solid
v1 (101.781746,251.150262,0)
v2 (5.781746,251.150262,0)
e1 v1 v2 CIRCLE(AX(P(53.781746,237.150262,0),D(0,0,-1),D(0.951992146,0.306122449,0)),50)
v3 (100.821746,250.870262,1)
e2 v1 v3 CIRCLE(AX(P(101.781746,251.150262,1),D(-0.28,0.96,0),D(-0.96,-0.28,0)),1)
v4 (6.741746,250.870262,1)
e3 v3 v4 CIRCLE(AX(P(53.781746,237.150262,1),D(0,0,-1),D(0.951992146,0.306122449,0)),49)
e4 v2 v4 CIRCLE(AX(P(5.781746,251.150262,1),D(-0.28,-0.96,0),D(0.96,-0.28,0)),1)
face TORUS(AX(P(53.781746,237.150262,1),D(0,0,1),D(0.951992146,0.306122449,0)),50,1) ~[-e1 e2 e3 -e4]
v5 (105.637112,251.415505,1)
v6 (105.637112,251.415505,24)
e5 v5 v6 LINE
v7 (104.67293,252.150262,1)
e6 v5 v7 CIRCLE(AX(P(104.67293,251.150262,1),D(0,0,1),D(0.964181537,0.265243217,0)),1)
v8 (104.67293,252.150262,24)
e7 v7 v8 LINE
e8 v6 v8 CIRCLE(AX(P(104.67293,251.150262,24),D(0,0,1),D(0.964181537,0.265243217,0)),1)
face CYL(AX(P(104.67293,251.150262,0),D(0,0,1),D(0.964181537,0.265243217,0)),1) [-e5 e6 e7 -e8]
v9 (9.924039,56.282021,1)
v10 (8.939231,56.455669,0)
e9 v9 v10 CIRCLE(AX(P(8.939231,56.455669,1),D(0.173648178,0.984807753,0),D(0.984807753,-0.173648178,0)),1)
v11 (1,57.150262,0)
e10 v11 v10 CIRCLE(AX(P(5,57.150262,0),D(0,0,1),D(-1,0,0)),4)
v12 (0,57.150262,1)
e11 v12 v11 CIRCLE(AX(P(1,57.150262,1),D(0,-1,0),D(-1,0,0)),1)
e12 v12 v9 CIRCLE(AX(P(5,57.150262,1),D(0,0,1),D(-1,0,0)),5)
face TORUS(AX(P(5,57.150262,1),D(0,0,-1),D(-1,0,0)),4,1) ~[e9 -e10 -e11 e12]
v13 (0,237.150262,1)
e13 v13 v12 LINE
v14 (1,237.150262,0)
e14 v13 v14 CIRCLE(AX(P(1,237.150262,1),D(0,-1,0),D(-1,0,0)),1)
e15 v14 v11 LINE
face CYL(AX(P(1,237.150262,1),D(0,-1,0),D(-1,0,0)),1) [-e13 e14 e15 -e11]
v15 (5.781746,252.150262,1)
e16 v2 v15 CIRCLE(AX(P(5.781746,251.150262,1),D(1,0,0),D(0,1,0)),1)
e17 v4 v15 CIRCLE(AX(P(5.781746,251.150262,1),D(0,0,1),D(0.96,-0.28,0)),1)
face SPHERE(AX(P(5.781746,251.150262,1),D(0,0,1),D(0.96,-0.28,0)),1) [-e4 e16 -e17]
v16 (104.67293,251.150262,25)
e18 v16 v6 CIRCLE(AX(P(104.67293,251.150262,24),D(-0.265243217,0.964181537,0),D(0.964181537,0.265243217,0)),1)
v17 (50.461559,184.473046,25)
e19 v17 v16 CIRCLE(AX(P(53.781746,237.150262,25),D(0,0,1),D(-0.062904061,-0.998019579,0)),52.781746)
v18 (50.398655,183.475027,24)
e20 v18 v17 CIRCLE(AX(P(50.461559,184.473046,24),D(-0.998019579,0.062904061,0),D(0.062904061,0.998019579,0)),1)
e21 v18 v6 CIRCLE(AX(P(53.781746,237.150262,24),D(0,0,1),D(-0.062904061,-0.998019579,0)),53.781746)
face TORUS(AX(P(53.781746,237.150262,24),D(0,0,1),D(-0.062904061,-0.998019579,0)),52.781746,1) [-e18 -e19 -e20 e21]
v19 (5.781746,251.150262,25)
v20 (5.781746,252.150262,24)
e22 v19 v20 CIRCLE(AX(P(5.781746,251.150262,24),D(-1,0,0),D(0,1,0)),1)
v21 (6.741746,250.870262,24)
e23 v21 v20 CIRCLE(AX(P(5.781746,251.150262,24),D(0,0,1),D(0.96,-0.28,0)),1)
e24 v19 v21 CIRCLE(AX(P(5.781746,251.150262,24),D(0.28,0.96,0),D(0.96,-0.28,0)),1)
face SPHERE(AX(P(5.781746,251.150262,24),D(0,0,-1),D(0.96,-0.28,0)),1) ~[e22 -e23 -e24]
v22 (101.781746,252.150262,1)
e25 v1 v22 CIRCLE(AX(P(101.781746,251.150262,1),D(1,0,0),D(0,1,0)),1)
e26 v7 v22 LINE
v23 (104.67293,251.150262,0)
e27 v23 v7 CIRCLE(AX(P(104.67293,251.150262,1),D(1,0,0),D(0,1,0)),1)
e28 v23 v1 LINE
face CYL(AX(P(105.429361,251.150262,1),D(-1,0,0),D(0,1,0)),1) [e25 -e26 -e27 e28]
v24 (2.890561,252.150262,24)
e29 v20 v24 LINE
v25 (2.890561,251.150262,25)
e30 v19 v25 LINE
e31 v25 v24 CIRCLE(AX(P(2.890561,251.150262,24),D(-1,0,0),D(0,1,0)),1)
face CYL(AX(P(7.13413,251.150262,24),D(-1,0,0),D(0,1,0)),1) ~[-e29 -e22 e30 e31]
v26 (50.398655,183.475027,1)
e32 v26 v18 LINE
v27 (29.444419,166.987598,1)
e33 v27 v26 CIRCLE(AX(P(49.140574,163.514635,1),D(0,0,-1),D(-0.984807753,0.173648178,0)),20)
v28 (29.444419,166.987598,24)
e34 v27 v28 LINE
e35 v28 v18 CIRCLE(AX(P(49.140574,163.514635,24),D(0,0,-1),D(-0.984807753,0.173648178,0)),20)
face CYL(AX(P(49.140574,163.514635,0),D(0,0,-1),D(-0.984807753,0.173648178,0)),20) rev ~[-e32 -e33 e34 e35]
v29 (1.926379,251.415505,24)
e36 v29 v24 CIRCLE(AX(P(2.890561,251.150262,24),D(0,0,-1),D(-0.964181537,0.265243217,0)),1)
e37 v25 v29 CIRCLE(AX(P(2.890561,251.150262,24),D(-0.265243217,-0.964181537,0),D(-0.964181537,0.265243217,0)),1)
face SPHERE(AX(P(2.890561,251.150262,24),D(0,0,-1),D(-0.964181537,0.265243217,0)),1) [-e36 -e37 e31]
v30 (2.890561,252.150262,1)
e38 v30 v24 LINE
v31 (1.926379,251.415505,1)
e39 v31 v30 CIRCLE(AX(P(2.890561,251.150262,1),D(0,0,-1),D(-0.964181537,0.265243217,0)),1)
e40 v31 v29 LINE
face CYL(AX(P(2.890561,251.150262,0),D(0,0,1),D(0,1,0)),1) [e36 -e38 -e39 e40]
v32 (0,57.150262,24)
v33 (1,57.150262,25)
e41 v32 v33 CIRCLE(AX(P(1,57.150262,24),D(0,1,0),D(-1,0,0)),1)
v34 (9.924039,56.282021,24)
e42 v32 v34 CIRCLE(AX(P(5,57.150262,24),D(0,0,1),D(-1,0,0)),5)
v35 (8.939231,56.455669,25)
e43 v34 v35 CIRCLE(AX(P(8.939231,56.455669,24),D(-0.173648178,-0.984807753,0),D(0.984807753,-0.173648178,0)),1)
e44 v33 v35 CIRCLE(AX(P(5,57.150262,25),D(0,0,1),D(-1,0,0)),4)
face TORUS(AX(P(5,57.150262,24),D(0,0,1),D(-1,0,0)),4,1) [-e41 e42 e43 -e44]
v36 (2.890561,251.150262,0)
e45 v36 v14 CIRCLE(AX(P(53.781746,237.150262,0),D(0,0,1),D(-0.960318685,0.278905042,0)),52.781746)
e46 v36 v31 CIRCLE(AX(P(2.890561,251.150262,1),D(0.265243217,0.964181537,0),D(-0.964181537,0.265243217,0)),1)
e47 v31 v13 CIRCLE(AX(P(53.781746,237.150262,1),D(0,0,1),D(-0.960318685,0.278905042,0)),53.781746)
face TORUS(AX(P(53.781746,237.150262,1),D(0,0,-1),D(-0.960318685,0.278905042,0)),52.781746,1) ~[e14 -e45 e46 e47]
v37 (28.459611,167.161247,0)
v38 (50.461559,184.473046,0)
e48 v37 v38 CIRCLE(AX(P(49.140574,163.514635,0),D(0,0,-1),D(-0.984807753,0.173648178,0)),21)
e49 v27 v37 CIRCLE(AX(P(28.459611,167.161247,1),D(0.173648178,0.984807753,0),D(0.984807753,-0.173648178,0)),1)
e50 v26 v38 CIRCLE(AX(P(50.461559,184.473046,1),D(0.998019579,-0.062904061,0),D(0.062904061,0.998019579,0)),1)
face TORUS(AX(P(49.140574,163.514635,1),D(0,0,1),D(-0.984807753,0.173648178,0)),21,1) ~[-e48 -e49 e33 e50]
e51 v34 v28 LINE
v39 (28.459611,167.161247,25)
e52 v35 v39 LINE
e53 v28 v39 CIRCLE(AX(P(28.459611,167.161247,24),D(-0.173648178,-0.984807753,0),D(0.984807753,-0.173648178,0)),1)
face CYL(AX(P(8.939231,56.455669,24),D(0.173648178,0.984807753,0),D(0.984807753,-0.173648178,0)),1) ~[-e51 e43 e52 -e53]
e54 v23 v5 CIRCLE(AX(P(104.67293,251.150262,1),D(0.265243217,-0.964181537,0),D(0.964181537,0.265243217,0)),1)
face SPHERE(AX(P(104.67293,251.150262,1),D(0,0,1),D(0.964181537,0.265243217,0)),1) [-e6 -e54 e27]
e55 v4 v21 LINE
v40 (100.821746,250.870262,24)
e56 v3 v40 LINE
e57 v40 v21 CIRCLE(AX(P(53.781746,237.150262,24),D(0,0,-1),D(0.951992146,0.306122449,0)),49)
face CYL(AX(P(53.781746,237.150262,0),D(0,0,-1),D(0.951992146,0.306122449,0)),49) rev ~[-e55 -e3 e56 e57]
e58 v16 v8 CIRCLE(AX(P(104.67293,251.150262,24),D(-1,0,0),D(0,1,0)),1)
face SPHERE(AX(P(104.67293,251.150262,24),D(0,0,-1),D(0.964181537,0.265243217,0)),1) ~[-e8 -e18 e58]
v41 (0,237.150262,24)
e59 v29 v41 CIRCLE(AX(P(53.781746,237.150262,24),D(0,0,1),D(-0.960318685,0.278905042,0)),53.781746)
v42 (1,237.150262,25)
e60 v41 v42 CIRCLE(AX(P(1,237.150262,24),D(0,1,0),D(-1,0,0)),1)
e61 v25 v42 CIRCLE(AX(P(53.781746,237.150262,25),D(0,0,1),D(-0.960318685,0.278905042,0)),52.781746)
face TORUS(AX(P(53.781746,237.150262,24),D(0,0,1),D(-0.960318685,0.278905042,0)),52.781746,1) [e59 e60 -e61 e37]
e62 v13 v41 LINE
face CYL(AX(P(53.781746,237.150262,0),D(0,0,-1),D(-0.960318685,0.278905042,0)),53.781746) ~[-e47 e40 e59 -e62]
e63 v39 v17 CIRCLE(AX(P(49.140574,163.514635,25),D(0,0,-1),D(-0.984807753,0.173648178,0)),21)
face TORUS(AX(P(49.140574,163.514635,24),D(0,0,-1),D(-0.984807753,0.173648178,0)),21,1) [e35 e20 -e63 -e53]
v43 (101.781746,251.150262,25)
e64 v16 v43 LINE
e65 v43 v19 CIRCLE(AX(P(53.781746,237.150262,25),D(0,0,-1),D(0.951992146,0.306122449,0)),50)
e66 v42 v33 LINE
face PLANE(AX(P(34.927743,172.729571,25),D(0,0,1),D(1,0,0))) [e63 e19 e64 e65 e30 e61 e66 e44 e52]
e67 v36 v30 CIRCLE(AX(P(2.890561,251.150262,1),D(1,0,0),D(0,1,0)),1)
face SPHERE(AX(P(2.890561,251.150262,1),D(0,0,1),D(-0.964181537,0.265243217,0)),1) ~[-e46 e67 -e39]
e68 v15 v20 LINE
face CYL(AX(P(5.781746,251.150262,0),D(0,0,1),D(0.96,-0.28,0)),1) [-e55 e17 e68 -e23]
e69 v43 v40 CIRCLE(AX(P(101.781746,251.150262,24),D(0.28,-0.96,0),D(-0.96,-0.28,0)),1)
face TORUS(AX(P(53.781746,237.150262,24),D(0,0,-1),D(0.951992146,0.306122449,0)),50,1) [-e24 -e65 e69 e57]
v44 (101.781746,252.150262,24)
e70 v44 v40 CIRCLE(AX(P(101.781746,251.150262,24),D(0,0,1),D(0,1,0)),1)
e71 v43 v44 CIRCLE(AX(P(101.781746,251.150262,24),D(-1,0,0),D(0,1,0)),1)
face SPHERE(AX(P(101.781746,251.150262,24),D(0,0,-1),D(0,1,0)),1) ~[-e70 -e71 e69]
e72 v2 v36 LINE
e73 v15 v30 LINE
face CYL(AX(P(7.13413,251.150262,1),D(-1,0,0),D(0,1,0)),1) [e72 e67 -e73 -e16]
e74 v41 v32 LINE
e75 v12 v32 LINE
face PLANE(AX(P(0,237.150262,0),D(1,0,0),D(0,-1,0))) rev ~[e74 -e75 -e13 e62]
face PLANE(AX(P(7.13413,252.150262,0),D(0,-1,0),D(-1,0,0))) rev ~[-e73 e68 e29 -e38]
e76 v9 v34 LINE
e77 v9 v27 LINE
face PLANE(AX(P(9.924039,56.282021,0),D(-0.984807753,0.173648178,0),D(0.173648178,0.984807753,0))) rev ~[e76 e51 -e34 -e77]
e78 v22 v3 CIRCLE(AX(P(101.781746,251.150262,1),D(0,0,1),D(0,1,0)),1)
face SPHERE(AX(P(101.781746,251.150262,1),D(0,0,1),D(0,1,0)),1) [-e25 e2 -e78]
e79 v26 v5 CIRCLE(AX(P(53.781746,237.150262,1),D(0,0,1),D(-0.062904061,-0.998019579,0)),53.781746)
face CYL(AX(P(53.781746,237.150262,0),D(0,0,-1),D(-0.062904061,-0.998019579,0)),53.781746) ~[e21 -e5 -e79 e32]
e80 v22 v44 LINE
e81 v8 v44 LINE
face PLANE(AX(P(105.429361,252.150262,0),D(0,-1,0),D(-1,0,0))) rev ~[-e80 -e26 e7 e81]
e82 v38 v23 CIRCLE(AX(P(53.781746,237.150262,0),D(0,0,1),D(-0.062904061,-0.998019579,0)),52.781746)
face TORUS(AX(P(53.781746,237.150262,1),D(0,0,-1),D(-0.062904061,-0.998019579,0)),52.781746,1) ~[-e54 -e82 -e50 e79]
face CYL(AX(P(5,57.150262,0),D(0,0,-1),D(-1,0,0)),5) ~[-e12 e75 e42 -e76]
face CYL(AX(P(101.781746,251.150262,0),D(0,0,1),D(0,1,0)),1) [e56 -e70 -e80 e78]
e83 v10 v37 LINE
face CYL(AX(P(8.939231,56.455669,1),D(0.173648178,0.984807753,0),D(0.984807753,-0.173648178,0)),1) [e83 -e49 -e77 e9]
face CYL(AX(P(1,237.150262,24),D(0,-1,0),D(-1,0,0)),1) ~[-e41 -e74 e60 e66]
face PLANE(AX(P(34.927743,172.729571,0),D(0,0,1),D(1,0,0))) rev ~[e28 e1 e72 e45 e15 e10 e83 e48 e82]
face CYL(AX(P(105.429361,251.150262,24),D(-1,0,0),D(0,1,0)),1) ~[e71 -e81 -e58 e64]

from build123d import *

# Parameters (mm, degrees)
F1_DEPTH = 25
F2_R     = 1


with BuildPart() as f1:
    # F0 (on Top) → F1 (new body)
    with BuildSketch(Plane.XY):
        with BuildLine():
            Line((0, 237.1502615138), (0, 57.1502615138))
            ThreePointArc((0, 57.1502615138), (4.5642212863, 52.1692880233), (9.9240387651, 56.2820206255))
            Line((9.9240387651, 56.2820206255), (29.4444190586, 166.987598496))
            ThreePointArc((29.4444190586, 166.987598496), (36.7733002708, 179.2324763201), (50.3986553344, 183.4750265133))
            ThreePointArc((50.3986553344, 183.4750265133), (95.7512352541, 203.5193518716), (105.4293606826, 252.1502615138))
            Line((105.4293606826, 252.1502615138), (100.4293606826, 252.1502615138))
            ThreePointArc((100.4293606826, 252.1502615138), (53.7817455238, 188.1502615138), (7.134130365, 252.1502615138))
            Line((7.134130365, 252.1502615138), (2.134130365, 252.1502615138))
            ThreePointArc((2.134130365, 252.1502615138), (0.536205584, 244.7257897531), (0, 237.1502615138))
        make_face()
    extrude(amount=F1_DEPTH)

    # F2
    f2_edges = [f1.edges().sort_by_distance(p)[0] for p in [
        (19.684229, 111.63481, 25),
        (102.929361, 252.150262, 25),
        (53.781746, 188.150262, 25),
        (4.63413, 252.150262, 25),
        (0.536206, 244.72579, 25),
        (19.684229, 111.63481, 0),
        (36.7733, 179.232476, 0),
        (95.751235, 203.519352, 0),
        (36.7733, 179.232476, 25),
        (95.751235, 203.519352, 25),
        (102.929361, 252.150262, 0),
        (53.781746, 188.150262, 0),
        (0, 147.150262, 0),
        (4.63413, 252.150262, 0),
        (0.536206, 244.72579, 0),
        (4.564221, 52.169288, 0),
        (105.429361, 252.150262, 12.5),
        (100.429361, 252.150262, 12.5),
        (7.13413, 252.150262, 12.5),
        (2.13413, 252.150262, 12.5),
        (0, 147.150262, 25),
        (4.564221, 52.169288, 25),
    ]]
    fillet(f2_edges, radius=F2_R)


solid = f1.part
